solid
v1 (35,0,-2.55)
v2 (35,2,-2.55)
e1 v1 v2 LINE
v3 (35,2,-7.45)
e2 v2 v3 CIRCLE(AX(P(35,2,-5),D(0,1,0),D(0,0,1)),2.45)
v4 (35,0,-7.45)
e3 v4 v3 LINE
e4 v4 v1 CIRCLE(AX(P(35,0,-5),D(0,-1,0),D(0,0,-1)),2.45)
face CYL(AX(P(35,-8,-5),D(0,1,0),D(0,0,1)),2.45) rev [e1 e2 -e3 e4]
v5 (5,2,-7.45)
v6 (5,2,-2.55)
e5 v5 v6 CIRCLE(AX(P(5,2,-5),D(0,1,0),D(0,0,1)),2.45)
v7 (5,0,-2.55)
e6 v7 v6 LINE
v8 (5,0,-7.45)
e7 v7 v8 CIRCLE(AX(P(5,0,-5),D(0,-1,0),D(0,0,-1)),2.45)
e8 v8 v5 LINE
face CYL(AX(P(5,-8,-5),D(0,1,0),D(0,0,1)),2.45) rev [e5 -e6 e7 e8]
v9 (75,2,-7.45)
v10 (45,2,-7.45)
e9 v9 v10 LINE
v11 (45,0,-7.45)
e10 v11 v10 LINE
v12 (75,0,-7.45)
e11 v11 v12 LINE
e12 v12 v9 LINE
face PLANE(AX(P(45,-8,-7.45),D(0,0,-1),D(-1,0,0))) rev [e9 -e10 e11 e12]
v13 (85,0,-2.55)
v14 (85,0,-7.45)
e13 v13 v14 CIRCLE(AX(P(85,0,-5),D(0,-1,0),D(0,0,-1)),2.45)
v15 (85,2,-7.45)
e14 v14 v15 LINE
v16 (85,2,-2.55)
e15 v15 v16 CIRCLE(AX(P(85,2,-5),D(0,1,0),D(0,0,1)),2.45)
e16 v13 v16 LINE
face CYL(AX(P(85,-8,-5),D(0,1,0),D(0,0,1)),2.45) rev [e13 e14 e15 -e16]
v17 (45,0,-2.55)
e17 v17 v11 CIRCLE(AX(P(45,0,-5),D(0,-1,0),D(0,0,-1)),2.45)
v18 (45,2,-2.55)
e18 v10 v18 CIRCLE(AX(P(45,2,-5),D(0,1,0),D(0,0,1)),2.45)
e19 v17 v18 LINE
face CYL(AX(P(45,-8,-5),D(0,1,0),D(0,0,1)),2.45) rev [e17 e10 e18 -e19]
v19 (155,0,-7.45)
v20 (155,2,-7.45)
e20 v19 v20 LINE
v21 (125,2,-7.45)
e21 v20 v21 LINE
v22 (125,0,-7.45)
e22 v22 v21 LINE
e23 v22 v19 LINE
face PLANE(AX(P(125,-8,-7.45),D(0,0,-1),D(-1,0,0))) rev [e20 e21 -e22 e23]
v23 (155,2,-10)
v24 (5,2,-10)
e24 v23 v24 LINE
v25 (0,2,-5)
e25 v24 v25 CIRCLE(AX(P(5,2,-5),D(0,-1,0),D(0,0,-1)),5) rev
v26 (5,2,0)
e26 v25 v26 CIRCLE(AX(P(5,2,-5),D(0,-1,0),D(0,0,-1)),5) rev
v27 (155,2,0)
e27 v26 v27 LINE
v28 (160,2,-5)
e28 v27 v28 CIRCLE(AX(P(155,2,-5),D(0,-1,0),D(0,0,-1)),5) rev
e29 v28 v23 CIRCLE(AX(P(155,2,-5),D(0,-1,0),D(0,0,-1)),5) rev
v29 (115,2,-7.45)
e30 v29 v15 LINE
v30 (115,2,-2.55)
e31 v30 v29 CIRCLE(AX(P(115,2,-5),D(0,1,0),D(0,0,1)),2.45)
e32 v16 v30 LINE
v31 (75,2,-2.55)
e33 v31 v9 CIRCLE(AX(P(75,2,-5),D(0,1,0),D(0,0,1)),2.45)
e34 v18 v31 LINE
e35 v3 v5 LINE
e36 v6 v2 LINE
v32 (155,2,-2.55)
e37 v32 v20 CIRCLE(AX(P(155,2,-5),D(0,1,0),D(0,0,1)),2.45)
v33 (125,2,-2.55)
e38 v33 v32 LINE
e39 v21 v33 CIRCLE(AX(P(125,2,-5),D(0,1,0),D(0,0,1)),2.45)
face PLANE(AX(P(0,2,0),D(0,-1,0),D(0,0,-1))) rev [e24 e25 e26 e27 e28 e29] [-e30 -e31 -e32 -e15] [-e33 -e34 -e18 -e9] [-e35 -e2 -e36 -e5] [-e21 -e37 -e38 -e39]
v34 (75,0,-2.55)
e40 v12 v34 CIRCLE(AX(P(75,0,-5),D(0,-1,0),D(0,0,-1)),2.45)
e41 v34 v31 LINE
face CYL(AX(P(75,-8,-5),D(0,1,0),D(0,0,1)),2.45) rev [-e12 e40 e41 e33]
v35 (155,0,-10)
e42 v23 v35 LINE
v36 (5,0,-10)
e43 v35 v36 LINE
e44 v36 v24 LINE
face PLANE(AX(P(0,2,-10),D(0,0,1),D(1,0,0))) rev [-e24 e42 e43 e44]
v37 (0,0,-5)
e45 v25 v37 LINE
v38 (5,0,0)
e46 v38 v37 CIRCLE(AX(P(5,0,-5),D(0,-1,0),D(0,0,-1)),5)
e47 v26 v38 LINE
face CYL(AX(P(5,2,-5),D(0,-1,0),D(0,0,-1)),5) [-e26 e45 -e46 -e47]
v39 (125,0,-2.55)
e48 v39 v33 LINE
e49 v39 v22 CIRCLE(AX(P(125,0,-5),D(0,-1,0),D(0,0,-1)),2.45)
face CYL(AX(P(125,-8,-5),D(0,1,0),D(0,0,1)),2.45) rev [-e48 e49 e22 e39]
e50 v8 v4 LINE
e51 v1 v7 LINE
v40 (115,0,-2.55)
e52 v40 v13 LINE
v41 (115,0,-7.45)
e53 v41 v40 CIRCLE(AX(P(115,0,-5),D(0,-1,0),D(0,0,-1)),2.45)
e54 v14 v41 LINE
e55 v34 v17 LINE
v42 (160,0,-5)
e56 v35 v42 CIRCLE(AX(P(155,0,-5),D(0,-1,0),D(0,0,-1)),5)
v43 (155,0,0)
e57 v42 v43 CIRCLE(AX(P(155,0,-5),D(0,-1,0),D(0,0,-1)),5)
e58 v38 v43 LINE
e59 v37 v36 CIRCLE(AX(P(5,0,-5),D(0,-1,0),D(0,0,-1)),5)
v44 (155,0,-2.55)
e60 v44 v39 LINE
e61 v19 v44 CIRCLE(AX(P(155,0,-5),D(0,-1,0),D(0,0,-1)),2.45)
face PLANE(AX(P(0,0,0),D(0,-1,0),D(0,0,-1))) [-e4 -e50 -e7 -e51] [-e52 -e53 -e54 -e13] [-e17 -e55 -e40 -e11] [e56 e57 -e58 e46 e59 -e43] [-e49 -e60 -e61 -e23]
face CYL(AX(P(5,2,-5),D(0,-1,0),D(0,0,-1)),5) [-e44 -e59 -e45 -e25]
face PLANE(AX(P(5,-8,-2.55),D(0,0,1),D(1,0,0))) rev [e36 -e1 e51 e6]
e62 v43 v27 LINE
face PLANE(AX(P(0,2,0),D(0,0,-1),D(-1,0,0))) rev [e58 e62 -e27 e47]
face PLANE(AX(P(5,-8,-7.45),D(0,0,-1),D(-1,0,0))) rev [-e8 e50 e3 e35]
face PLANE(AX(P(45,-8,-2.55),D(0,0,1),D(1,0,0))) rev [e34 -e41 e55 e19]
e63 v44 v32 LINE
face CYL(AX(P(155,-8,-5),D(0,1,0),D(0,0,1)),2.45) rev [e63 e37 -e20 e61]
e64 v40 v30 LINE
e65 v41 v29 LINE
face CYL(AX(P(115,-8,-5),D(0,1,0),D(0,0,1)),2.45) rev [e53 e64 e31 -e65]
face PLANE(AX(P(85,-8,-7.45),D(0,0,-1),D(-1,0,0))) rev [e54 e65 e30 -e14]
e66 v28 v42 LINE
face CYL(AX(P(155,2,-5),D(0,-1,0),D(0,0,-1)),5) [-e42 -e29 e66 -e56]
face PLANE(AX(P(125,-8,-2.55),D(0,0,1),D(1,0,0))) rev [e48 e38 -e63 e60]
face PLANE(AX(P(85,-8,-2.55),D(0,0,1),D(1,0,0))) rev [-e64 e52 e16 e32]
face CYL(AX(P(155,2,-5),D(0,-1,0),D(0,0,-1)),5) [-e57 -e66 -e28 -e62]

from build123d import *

# Parameters (mm, degrees)
SKETCH_1_W          = 160
SKETCH_1_H          = 10
EXTRUDE_1_DEPTH     = 2
FILLET_1_R          = 5
CUT_EXTRUDE_1_DEPTH = 10


with BuildPart() as part:
    # 스케치1 → 보스-돌출1 (new body)
    with BuildSketch(Plane(origin=(0, 0, 0), x_dir=(1, 0, 0), z_dir=(0, 1, 0))):
        with Locations((80, 5)):
            Rectangle(SKETCH_1_W, SKETCH_1_H)
    extrude(amount=EXTRUDE_1_DEPTH)

    # 필렛1
    fillet_1_edges = [part.edges().sort_by_distance(p)[0] for p in [
        (0, 1, 0),
        (0, 1, -10),
        (160, 1, -10),
        (160, 1, 0),
    ]]
    fillet(fillet_1_edges, radius=FILLET_1_R - 0.0001)  # a hair under: the kernel refuses the full size

    # 스케치2 → 컷-돌출1 (cut)
    with BuildSketch(Plane(origin=(0, 2, 0), x_dir=(1, 0, 0), z_dir=(0, 1, 0))):
        with BuildLine():
            Line((5, 7.45), (35, 7.45))
            ThreePointArc((35, 7.45), (37.45, 5), (35, 2.55))
            Line((35, 2.55), (5, 2.55))
            ThreePointArc((5, 2.55), (2.55, 5), (5, 7.45))
        make_face()
        with BuildLine():
            Line((45, 7.45), (75, 7.45))
            ThreePointArc((75, 7.45), (77.45, 5), (75, 2.55))
            Line((75, 2.55), (45, 2.55))
            ThreePointArc((45, 2.55), (42.55, 5), (45, 7.45))
        make_face()
        with BuildLine():
            Line((85, 7.45), (115, 7.45))
            ThreePointArc((115, 7.45), (117.45, 5), (115, 2.55))
            Line((115, 2.55), (85, 2.55))
            ThreePointArc((85, 2.55), (82.55, 5), (85, 7.45))
        make_face()
        with BuildLine():
            Line((125, 7.45), (155, 7.45))
            ThreePointArc((155, 7.45), (157.45, 5), (155, 2.55))
            Line((155, 2.55), (125, 2.55))
            ThreePointArc((125, 2.55), (122.55, 5), (125, 7.45))
        make_face()
    extrude(amount=-CUT_EXTRUDE_1_DEPTH, mode=Mode.SUBTRACT)


solid = part.part
